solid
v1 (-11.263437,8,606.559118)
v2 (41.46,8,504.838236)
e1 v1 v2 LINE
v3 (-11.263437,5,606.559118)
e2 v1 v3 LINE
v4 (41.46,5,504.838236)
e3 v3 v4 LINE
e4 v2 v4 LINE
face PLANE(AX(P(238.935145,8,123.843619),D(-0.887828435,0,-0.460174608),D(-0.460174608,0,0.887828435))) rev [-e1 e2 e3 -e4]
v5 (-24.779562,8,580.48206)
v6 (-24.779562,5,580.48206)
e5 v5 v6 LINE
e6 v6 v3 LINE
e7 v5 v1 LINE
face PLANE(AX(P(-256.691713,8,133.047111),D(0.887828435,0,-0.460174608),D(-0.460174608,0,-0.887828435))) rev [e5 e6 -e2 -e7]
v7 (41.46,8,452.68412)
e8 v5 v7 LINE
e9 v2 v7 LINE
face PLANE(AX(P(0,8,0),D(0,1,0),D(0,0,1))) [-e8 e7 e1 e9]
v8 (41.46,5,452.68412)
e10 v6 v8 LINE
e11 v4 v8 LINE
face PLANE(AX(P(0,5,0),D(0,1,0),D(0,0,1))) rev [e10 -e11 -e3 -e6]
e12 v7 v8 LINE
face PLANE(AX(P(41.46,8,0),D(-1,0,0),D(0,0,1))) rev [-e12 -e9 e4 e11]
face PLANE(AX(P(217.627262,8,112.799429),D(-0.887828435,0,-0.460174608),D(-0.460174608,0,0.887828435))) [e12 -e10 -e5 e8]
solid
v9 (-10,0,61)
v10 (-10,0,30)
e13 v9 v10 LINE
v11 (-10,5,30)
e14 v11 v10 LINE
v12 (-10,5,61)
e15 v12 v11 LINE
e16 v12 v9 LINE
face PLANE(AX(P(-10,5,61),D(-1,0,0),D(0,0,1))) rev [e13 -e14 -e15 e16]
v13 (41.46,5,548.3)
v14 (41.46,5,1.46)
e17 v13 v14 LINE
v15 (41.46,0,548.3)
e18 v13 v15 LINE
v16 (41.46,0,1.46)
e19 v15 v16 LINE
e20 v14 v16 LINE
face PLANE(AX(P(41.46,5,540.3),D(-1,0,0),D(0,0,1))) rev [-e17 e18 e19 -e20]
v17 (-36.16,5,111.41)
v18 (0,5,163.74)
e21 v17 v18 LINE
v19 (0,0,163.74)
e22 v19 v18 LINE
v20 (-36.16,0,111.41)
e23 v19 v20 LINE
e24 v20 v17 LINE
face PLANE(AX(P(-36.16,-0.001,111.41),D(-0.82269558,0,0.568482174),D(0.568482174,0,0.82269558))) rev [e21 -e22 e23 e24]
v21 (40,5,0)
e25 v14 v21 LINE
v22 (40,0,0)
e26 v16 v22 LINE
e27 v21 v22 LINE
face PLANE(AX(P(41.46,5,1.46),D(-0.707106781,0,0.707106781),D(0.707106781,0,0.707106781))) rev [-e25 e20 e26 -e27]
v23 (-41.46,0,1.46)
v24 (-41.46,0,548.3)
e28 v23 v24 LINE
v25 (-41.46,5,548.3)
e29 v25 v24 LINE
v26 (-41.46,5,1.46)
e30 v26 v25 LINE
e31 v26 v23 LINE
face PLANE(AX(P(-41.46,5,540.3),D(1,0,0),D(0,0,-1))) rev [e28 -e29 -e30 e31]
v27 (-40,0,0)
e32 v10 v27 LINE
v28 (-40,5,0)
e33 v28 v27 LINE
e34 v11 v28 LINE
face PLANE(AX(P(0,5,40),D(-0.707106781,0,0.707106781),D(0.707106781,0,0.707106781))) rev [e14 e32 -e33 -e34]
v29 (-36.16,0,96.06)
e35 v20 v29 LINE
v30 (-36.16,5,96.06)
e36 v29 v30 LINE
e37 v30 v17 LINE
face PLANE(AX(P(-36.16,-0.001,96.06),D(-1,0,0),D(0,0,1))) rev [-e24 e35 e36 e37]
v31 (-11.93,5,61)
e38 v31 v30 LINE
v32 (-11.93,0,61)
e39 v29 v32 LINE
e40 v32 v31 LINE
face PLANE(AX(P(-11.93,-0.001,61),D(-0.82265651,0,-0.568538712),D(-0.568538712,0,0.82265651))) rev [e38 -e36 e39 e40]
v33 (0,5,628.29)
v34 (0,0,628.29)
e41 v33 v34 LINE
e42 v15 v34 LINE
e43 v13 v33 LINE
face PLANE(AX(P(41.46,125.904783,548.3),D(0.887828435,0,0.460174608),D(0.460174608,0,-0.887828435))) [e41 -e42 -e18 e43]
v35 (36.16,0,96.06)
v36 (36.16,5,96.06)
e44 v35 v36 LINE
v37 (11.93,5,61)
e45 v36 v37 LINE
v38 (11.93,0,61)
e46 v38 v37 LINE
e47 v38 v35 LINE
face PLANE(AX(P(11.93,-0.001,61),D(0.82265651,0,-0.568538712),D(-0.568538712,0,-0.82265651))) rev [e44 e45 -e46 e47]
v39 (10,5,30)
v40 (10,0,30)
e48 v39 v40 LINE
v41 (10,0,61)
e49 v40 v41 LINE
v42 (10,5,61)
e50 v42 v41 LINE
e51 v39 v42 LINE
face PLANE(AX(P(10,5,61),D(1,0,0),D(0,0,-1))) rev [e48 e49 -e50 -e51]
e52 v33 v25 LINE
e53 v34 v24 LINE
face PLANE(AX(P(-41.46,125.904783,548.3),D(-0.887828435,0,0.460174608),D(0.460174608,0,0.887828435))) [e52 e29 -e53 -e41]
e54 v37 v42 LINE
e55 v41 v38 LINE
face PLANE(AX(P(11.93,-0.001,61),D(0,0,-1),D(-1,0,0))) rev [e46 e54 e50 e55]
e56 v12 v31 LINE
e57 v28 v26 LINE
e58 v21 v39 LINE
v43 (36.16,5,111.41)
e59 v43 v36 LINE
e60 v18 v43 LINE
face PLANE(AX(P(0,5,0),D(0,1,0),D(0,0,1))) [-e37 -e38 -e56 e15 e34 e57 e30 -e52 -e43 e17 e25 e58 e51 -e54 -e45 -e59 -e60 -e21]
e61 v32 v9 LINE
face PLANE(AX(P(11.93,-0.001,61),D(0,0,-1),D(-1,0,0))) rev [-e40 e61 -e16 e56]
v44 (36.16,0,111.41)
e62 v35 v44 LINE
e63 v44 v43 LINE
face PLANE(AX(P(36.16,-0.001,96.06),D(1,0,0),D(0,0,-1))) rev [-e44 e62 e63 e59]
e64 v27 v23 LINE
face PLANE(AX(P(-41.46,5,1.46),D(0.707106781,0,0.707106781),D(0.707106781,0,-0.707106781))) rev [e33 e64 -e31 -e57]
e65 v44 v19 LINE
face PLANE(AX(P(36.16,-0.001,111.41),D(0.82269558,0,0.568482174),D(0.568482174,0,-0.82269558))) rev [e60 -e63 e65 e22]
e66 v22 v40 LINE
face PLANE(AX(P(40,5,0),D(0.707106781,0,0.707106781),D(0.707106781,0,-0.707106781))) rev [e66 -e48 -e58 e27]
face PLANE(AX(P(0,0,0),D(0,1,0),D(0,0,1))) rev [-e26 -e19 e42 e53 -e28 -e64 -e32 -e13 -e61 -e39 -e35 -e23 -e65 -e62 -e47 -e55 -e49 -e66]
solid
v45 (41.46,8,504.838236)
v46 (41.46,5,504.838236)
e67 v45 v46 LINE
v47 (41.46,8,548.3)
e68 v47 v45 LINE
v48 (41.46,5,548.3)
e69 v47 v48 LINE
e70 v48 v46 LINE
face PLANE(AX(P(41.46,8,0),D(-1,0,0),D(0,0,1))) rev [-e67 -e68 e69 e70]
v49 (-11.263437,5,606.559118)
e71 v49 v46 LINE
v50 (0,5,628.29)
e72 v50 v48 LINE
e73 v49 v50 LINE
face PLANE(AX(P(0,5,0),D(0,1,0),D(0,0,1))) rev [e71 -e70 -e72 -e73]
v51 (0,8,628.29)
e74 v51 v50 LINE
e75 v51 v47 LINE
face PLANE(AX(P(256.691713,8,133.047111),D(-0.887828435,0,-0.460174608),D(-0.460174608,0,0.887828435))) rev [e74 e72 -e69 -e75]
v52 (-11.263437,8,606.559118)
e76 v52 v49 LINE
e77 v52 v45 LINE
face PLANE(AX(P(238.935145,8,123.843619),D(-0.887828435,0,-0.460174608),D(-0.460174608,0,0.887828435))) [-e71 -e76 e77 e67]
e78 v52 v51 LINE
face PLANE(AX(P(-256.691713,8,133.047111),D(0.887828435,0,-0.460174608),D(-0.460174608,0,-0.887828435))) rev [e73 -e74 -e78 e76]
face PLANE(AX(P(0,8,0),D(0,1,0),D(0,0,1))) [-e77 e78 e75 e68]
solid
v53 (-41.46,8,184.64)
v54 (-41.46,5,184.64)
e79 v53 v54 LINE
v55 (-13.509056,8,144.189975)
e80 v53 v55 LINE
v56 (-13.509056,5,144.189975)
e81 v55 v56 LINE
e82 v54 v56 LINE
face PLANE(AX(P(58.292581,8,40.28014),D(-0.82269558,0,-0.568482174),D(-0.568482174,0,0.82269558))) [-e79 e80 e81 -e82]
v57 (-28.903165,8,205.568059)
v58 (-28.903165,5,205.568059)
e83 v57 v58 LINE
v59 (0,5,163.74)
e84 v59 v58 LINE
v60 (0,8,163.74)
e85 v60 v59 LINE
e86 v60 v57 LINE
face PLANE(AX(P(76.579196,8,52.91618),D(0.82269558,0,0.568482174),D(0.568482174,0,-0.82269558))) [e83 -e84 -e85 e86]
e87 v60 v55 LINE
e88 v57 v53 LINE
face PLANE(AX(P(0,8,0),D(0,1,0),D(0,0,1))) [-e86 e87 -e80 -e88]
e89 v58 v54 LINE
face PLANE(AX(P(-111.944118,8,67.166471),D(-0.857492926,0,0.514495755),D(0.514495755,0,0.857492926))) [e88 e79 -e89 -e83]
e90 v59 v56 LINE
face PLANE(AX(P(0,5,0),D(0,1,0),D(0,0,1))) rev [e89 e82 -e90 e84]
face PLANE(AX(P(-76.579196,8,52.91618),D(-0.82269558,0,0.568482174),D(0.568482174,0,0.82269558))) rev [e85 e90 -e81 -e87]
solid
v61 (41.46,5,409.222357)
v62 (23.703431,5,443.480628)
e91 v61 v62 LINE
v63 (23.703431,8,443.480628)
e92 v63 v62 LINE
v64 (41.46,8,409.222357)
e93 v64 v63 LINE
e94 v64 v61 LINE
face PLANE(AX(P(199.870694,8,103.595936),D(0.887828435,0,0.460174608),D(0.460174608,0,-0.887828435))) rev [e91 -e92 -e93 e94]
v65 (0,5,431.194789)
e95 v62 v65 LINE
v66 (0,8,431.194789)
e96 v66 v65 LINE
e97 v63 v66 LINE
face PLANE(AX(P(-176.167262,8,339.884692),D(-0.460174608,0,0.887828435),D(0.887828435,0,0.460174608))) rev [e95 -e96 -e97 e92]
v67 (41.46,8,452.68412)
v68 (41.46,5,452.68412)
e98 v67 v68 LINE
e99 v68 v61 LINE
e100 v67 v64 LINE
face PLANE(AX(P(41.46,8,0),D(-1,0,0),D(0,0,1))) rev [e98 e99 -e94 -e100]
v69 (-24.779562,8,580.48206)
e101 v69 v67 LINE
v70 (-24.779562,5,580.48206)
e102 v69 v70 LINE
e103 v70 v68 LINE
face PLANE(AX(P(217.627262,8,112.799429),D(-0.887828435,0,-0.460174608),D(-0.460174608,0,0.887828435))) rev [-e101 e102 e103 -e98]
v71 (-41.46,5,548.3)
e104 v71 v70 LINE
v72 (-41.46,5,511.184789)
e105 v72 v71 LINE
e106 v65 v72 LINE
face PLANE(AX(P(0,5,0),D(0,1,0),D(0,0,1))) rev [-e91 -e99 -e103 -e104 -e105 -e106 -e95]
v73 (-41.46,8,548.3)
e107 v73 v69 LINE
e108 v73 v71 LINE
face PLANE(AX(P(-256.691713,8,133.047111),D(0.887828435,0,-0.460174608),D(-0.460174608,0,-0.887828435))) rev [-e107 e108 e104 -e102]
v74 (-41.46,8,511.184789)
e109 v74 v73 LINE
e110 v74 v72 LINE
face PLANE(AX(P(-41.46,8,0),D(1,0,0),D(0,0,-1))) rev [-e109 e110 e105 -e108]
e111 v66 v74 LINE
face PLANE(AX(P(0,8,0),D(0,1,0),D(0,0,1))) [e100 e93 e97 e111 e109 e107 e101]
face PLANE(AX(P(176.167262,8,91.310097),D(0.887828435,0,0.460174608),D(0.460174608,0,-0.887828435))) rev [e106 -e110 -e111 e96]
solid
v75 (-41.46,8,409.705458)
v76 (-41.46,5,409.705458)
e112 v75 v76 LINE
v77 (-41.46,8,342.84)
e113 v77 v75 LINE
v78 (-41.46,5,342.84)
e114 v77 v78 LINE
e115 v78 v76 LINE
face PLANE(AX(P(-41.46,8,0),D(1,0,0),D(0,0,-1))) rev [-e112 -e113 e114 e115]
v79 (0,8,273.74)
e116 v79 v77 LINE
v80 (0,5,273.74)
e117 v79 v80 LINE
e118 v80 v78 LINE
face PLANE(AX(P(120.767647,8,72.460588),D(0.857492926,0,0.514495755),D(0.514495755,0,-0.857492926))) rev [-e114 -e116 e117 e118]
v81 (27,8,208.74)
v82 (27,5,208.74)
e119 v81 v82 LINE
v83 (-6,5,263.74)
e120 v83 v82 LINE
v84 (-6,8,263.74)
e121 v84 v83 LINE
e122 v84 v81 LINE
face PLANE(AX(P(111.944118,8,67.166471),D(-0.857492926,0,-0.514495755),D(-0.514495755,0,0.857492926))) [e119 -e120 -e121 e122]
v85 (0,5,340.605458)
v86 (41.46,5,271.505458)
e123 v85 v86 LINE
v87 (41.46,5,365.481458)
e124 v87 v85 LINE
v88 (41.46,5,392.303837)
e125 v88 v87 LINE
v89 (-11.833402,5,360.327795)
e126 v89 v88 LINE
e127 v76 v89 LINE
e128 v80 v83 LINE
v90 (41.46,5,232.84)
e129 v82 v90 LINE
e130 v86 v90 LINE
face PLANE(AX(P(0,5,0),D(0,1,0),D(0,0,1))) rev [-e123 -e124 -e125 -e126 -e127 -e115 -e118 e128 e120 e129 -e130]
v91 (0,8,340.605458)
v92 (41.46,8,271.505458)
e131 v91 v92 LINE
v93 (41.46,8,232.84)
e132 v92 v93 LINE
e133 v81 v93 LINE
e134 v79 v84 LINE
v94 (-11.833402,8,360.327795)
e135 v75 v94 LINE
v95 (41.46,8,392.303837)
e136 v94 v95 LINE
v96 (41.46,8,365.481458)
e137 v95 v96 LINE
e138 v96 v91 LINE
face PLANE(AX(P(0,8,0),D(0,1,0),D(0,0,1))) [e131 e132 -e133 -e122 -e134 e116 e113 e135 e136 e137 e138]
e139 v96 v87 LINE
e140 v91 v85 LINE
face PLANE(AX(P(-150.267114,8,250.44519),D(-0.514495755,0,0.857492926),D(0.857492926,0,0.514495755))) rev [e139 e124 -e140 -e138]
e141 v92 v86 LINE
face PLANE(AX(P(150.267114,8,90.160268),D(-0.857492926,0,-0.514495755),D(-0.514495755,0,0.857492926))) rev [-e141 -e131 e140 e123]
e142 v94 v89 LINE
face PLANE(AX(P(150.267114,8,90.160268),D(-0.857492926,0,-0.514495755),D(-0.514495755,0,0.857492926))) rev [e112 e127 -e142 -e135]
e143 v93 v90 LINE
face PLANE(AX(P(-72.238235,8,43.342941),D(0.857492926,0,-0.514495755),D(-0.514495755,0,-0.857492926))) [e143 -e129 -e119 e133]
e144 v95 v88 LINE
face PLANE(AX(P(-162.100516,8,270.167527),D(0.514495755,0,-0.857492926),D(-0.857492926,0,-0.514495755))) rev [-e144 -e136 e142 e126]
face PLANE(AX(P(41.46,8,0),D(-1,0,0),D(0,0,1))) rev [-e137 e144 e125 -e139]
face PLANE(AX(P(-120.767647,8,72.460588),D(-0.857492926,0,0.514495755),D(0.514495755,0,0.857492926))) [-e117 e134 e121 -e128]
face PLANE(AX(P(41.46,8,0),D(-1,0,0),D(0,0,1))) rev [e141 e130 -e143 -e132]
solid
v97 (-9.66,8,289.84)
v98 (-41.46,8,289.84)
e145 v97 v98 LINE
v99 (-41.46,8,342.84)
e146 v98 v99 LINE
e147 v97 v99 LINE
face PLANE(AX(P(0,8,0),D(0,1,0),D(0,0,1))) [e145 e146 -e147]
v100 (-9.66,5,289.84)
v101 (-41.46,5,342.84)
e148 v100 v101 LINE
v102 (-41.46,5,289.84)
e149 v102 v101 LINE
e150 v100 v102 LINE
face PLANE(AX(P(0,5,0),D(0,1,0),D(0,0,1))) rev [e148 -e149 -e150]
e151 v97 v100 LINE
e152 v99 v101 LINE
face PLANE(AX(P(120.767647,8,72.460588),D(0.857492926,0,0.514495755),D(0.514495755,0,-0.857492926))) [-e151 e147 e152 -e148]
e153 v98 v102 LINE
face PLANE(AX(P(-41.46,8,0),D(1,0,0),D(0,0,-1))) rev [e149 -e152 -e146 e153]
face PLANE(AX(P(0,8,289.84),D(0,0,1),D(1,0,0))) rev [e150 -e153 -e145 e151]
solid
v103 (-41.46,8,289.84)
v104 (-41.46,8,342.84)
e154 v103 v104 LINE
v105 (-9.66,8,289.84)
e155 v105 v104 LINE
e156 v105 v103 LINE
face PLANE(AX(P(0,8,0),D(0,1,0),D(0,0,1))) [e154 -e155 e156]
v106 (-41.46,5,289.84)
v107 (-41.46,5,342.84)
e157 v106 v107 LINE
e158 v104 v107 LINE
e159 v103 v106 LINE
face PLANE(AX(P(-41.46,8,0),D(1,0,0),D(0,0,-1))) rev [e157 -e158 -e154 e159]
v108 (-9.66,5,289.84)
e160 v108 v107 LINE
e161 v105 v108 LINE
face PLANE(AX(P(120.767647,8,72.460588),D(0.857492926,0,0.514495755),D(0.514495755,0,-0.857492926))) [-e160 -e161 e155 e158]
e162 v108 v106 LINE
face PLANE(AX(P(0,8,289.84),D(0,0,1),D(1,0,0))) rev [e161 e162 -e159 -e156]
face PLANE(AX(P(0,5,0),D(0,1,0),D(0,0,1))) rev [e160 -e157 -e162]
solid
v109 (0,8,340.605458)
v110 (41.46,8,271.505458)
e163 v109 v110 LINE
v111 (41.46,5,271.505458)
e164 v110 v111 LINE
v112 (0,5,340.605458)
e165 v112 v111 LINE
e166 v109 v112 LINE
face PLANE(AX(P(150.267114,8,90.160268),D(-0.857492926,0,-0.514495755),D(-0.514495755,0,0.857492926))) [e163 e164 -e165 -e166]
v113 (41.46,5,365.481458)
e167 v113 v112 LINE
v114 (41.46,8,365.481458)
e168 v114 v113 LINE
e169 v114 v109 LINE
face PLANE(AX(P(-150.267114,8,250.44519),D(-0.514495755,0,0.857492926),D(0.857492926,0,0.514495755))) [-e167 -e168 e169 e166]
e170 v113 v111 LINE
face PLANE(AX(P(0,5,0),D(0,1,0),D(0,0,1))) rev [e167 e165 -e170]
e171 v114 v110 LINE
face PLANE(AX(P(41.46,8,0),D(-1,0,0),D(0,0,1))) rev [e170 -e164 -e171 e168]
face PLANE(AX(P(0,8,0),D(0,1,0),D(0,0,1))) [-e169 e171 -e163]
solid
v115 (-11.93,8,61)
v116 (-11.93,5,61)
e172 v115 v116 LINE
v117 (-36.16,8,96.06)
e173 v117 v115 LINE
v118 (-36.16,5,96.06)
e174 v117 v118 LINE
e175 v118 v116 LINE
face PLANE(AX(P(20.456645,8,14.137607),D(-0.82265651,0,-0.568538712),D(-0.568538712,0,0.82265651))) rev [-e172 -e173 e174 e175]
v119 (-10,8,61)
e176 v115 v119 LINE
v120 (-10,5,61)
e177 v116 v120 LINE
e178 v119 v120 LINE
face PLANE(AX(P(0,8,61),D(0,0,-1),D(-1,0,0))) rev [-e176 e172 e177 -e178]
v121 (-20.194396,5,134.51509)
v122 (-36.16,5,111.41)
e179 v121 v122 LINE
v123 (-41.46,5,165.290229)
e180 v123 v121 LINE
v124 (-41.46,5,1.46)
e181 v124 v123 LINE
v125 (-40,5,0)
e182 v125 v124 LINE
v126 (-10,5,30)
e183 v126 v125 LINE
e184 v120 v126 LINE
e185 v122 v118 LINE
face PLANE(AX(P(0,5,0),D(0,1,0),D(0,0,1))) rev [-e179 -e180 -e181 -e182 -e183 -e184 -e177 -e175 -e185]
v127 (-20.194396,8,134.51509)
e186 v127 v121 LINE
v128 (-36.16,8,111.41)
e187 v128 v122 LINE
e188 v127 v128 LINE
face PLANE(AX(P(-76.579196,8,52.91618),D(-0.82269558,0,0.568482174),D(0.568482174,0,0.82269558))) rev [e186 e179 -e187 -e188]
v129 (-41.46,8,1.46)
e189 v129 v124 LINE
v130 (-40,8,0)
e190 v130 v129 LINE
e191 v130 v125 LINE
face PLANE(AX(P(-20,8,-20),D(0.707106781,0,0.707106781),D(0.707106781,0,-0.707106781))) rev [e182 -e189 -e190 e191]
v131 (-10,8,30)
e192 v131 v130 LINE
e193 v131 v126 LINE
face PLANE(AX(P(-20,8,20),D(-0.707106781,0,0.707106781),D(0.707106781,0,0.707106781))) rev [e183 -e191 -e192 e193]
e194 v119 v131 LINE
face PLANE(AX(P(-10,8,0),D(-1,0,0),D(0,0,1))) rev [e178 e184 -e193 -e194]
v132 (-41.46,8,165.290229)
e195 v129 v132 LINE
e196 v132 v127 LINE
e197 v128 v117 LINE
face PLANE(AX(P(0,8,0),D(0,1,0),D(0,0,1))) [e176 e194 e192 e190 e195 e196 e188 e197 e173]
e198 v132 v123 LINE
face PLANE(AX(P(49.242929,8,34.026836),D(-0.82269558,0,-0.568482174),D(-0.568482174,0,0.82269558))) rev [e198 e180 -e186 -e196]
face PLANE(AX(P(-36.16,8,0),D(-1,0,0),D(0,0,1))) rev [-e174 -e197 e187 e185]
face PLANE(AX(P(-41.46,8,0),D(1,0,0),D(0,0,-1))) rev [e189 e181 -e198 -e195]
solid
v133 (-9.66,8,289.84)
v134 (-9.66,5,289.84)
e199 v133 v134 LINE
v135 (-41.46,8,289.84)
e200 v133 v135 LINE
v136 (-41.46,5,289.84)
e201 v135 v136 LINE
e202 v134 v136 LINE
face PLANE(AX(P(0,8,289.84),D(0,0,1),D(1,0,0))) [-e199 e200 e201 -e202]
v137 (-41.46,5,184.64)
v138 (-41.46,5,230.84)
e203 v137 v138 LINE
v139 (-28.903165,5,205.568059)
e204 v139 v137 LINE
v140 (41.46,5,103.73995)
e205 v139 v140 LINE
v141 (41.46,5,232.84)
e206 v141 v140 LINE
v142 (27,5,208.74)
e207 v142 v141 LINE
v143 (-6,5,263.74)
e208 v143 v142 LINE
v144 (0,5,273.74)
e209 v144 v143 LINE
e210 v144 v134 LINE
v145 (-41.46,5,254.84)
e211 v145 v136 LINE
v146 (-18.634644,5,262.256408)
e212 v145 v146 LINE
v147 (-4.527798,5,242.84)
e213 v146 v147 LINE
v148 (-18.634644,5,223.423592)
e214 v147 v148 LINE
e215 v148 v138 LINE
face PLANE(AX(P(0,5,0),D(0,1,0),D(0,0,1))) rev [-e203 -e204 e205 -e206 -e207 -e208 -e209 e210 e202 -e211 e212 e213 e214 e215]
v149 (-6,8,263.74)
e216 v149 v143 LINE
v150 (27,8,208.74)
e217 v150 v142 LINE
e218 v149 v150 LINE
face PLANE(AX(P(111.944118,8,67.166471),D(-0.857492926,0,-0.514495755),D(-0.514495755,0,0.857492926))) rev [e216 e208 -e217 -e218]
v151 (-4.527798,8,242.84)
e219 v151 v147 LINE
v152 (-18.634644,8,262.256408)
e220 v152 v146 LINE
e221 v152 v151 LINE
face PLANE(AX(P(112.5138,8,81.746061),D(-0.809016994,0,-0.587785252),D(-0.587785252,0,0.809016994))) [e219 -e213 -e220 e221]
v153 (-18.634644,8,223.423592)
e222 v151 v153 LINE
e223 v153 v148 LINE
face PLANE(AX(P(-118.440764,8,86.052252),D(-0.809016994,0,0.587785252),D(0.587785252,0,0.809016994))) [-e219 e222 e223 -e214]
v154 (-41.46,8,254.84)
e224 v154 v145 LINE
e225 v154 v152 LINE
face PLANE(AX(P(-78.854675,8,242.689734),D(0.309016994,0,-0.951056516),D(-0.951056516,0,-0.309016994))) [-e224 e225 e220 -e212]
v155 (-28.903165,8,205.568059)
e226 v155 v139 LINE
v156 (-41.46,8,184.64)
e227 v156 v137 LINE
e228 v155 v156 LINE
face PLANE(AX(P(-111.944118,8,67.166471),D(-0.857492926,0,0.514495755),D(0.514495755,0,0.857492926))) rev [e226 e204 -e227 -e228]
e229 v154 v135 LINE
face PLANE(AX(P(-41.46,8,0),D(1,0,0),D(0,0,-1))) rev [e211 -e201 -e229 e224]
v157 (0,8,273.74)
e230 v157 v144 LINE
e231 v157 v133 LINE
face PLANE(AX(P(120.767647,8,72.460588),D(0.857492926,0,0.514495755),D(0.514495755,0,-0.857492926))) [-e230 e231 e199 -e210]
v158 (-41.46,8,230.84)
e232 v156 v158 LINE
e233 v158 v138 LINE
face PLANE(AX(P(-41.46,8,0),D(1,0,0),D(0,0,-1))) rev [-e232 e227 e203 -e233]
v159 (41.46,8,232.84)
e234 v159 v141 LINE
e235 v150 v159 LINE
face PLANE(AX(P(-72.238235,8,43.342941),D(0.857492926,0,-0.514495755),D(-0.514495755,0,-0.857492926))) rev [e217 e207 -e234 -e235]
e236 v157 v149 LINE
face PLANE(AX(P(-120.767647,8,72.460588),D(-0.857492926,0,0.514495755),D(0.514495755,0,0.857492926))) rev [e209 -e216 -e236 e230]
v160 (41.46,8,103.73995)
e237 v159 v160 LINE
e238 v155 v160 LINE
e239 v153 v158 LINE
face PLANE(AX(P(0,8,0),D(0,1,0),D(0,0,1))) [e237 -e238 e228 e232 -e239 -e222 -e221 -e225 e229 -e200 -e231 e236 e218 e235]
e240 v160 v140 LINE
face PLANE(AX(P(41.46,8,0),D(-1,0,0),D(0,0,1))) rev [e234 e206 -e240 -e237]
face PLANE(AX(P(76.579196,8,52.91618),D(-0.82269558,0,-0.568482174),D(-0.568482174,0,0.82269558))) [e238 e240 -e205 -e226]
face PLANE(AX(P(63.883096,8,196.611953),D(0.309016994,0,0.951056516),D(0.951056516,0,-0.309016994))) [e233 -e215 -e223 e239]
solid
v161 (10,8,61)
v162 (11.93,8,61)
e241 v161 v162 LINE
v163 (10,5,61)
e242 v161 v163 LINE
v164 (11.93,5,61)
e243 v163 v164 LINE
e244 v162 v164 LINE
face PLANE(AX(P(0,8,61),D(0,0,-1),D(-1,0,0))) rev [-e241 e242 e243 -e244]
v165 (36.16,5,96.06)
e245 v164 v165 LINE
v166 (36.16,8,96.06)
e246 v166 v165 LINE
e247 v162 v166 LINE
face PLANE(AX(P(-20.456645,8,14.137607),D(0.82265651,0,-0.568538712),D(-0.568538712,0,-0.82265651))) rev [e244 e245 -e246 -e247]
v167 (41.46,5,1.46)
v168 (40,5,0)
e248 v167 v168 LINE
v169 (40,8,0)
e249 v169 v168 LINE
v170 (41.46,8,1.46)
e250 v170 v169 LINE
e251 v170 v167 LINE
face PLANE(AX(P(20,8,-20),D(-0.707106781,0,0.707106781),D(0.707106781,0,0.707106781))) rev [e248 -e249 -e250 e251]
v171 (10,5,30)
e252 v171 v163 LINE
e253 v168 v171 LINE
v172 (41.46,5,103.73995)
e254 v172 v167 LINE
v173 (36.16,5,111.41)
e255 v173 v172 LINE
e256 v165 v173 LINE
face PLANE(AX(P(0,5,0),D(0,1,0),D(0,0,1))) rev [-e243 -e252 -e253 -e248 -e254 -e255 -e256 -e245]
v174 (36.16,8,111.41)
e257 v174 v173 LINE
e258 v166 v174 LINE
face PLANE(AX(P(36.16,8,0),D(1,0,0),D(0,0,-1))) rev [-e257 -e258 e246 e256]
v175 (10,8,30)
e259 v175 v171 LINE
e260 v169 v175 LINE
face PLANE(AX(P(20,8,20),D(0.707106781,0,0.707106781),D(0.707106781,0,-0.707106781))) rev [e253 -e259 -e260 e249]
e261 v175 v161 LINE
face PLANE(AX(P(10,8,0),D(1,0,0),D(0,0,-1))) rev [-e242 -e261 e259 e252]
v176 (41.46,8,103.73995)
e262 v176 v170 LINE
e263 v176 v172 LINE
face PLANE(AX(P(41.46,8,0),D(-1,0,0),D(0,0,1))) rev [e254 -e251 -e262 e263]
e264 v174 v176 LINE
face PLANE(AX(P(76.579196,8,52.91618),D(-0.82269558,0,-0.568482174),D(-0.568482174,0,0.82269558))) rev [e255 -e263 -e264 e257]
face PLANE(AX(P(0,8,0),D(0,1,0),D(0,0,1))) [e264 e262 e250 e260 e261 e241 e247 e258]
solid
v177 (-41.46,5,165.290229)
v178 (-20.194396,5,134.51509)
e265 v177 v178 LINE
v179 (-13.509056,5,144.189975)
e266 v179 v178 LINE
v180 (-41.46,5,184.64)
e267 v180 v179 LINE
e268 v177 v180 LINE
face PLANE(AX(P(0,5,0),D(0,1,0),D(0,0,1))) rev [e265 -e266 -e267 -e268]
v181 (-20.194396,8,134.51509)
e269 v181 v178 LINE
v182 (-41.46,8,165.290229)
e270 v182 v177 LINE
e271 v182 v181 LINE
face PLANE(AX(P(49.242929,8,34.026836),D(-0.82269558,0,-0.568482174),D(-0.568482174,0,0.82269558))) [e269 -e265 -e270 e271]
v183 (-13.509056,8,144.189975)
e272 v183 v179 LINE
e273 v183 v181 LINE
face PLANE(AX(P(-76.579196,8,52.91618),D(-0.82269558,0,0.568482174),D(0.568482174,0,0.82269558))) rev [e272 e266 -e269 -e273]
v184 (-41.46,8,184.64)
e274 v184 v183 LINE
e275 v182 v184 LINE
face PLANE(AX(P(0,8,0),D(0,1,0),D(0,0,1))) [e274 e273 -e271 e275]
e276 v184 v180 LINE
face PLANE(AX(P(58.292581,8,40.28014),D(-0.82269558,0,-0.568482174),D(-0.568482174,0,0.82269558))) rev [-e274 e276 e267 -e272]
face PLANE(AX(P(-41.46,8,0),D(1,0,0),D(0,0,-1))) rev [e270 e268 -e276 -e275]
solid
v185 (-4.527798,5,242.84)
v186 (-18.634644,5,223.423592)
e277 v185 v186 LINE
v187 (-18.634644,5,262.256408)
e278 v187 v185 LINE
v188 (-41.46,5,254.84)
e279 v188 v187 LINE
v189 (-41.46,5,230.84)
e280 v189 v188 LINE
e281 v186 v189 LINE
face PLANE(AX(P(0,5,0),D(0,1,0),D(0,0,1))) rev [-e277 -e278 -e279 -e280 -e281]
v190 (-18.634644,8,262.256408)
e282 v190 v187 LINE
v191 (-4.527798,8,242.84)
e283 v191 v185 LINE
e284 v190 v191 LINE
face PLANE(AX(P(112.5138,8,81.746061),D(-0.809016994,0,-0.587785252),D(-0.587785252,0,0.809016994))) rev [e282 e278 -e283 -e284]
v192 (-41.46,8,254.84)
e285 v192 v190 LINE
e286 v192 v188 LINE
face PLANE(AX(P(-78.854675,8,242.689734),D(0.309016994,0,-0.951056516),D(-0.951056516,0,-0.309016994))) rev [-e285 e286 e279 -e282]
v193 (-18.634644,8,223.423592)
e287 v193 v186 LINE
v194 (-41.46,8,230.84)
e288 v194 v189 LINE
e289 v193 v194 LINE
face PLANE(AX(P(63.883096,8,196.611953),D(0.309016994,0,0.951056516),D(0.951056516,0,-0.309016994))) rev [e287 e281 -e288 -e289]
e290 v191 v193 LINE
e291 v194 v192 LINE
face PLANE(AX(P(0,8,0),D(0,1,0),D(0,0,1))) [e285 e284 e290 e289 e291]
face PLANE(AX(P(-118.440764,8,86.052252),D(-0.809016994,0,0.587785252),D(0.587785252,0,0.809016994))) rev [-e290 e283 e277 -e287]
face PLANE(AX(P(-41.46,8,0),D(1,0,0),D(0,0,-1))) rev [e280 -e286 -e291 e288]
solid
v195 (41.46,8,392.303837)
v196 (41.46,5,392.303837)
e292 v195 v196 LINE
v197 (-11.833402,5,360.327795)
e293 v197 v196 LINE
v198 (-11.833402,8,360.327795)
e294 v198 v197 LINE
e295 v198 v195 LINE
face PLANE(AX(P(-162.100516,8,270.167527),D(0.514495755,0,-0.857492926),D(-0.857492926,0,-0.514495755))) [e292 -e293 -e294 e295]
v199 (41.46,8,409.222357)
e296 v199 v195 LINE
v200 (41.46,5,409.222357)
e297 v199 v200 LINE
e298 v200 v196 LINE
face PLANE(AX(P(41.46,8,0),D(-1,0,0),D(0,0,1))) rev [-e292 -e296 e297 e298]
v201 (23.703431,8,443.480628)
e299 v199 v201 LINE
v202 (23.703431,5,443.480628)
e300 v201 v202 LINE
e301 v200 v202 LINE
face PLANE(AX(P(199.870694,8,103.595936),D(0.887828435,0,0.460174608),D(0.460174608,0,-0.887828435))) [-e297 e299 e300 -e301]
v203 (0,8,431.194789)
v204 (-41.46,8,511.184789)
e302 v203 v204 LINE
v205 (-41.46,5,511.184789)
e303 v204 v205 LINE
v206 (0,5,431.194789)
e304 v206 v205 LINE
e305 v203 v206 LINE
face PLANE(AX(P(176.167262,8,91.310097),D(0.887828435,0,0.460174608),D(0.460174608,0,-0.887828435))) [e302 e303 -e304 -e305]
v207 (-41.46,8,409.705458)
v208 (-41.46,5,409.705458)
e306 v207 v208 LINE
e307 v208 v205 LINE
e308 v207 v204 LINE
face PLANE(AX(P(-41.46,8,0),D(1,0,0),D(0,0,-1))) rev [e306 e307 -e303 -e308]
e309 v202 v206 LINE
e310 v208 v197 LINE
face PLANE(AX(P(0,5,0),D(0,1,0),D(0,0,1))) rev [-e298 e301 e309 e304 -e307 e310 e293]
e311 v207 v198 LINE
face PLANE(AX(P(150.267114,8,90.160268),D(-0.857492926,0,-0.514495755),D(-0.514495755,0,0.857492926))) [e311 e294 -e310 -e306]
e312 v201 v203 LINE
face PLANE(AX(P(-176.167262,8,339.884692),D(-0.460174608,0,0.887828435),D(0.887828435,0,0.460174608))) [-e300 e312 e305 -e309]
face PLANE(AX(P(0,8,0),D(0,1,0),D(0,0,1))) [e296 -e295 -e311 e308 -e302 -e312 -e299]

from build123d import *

# Parameters (mm, degrees)
EXTRUDE_1_DEPTH          = 5
CUT_EXTRUDE_1_REACH      = 623.694
CUT_EXTRUDE_8_DEPTH      = 622.694149643
CUT_EXTRUDE_8_DEPTH_BACK = 622.694149643
SKETCH_4_W               = 20
SKETCH_4_H               = 31
EXTRUDE_2_DEPTH          = 5
EXTRUDE_8_DEPTH          = 3
EXTRUDE_8_2_DEPTH        = 3
EXTRUDE_8_3_DEPTH        = 3
EXTRUDE_8_4_DEPTH        = 3
EXTRUDE_8_5_DEPTH        = 3
EXTRUDE_9_DEPTH          = 3
EXTRUDE_9_2_DEPTH        = 3
EXTRUDE_12_DEPTH         = 3
EXTRUDE_12_2_DEPTH       = 3
EXTRUDE_12_3_DEPTH       = 3
EXTRUDE_12_4_DEPTH       = 3
EXTRUDE_12_5_DEPTH       = 3
EXTRUDE_14_DEPTH         = 3
EXTRUDE_14_2_DEPTH       = 3


# Read off the part's stored shape, not the designer's step: 凸台-拉伸9
with BuildPart() as part:
    # 草图1 → 凸台-拉伸1 (new body)
    with BuildSketch(Plane(origin=(0, 0, 0), x_dir=(1, 0, 0), z_dir=(0, 1, 0))):
        Polygon((40, 0), (0, -40), (-40, 0), (-41.46, -1.46), (-41.46, -540.3), (0, -620.29), (41.46, -540.3), (41.46, -1.46), align=None)
    extrude(amount=EXTRUDE_1_DEPTH)

    # 草图2 → 切除-拉伸1 (cut, up to next)
    with BuildSketch(Plane(origin=(0, 5, 0), x_dir=(1, 0, 0), z_dir=(0, 1, 0)), mode=Mode.PRIVATE) as cut_extrude_1_sk1:
        Polygon((11.93, -61), (-11.93, -61), (-36.16, -96.06), (-36.16, -111.41), (0, -163.74), (36.16, -111.41), (36.16, -96.06), align=None)
    cut_extrude_1_tool1 = extrude(cut_extrude_1_sk1.sketch, amount=-CUT_EXTRUDE_1_REACH, mode=Mode.PRIVATE) & part.part
    add(cut_extrude_1_tool1.solids().sort_by_distance((0, 5, 105.867422))[0], mode=Mode.SUBTRACT)

    # 草图4 → 切除-拉伸8 (cut, two sides: drawn at the far end of the back side and taken through both)
    with BuildSketch(Plane.XZ.offset(-CUT_EXTRUDE_8_DEPTH_BACK)):
        with Locations((0, 45.5)):
            Rectangle(SKETCH_4_W, SKETCH_4_H)
    extrude(amount=CUT_EXTRUDE_8_DEPTH + CUT_EXTRUDE_8_DEPTH_BACK, mode=Mode.SUBTRACT)

    # 草图5 → 凸台-拉伸2 (add)
    with BuildSketch(Plane.XZ):
        Polygon((-41.46, 540.3), (-41.46, 548.3), (0, 628.29), (41.46, 548.3), (41.46, 540.3), (0, 620.29), align=None)
    extrude(amount=-EXTRUDE_2_DEPTH)


with BuildPart() as body_2:
    # 草图9 → 凸台-拉伸8 (new body)
    with BuildSketch(Plane(origin=(0, 5, 0), x_dir=(1, 0, 0), z_dir=(0, 1, 0))):
        Polygon((-41.46, -342.84), (-9.66, -289.84), (-41.46, -289.84), align=None)
    extrude(amount=EXTRUDE_8_DEPTH)


with BuildPart() as body_3:
    # 草图9 → Extrude 8 2 (new body)
    with BuildSketch(Plane(origin=(0, 5, 0), x_dir=(1, 0, 0), z_dir=(0, 1, 0))):
        Polygon((-28.903164688, -205.568058853), (0, -163.74), (-13.509055991, -144.189975111), (-41.46, -184.64), align=None)
    extrude(amount=EXTRUDE_8_2_DEPTH)


with BuildPart() as body_4:
    # 草图9 → Extrude 8 3 (new body)
    with BuildSketch(Plane(origin=(0, 5, 0), x_dir=(1, 0, 0), z_dir=(0, 1, 0))):
        Polygon((-41.46, -230.84), (-41.46, -254.84), (-18.634643609, -262.256407865), (-4.527797554, -242.84), (-18.634643609, -223.423592135), align=None)
    extrude(amount=EXTRUDE_8_3_DEPTH)


with BuildPart() as body_5:
    # 草图9 → Extrude 8 4 (new body)
    with BuildSketch(Plane(origin=(0, 5, 0), x_dir=(1, 0, 0), z_dir=(0, 1, 0))):
        Polygon((36.16, -111.41), (41.46, -103.739950221), (41.46, -1.46), (40, 0), (10, -30), (10, -61), (11.93, -61), (36.16, -96.06), align=None)
    extrude(amount=EXTRUDE_8_4_DEPTH)


with BuildPart() as body_6:
    # 草图9 → Extrude 8 5 (new body)
    with BuildSketch(Plane(origin=(0, 5, 0), x_dir=(1, 0, 0), z_dir=(0, 1, 0))):
        Polygon((-41.46, -165.290228805), (-20.194396392, -134.515089513), (-36.16, -111.41), (-36.16, -96.06), (-11.93, -61), (-10, -61), (-10, -30), (-40, 0), (-41.46, -1.46), align=None)
    extrude(amount=EXTRUDE_8_5_DEPTH)


with BuildPart() as body_7:
    # 凸台-拉伸9 outline → 凸台-拉伸9 (new body)
    with BuildSketch(Plane(origin=(0, 5, 0), x_dir=(1, 0, 0), z_dir=(0, 1, 0))):
        Polygon((41.46, -548.3), (41.46, -504.838236483), (-11.263437401, -606.559118242), (0, -628.29), align=None)
    extrude(amount=EXTRUDE_9_DEPTH)


with BuildPart() as body_8:
    # Extrude 9 2 outline → Extrude 9 2 (new body)
    with BuildSketch(Plane(origin=(0, 5, 0), x_dir=(1, 0, 0), z_dir=(0, 1, 0))):
        Polygon((-41.46, -289.84), (-41.46, -342.84), (-9.66, -289.84), align=None)
    extrude(amount=EXTRUDE_9_2_DEPTH)


with BuildPart() as body_9:
    # 草图9<12> → 凸台-拉伸12 (new body)
    with BuildSketch(Plane(origin=(0, 5, 0), x_dir=(1, 0, 0), z_dir=(0, 1, 0))):
        Polygon((-9.66, -289.84), (0, -273.74), (-6, -263.74), (27, -208.74), (41.46, -232.84), (41.46, -103.739950221), (-28.903164688, -205.568058853), (-41.46, -184.64), (-41.46, -230.84), (-18.634643609, -223.423592135), (-4.527797554, -242.84), (-18.634643609, -262.256407865), (-41.46, -254.84), (-41.46, -289.84), align=None)
    extrude(amount=EXTRUDE_12_DEPTH)


with BuildPart() as body_10:
    # 草图9<12> → Extrude 12 2 (new body)
    with BuildSketch(Plane(origin=(0, 5, 0), x_dir=(1, 0, 0), z_dir=(0, 1, 0))):
        Polygon((-11.833402375, -360.327795222), (-41.46, -409.70545793), (-41.46, -511.184789097), (0, -431.194789097), (23.703431301, -443.480628098), (41.46, -409.222356746), (41.46, -392.303836646), align=None)
    extrude(amount=EXTRUDE_12_2_DEPTH)


with BuildPart() as body_11:
    # 草图9<12> → Extrude 12 3 (new body)
    with BuildSketch(Plane(origin=(0, 5, 0), x_dir=(1, 0, 0), z_dir=(0, 1, 0))):
        Polygon((41.46, -365.48145793), (41.46, -271.50545793), (0, -340.60545793), align=None)
    extrude(amount=EXTRUDE_12_3_DEPTH)


with BuildPart() as body_12:
    # 草图9<12> → Extrude 12 4 (new body)
    with BuildSketch(Plane(origin=(0, 5, 0), x_dir=(1, 0, 0), z_dir=(0, 1, 0))):
        Polygon((-41.46, -184.64), (-13.509055991, -144.189975111), (-20.194396392, -134.515089513), (-41.46, -165.290228805), align=None)
    extrude(amount=EXTRUDE_12_4_DEPTH)


with BuildPart() as body_13:
    # 草图9<12> → Extrude 12 5 (new body)
    with BuildSketch(Plane(origin=(0, 5, 0), x_dir=(1, 0, 0), z_dir=(0, 1, 0))):
        Polygon((41.46, -504.838236483), (41.46, -452.684120263), (-24.779562282, -580.482060131), (-11.263437401, -606.559118242), align=None)
    extrude(amount=EXTRUDE_12_5_DEPTH)


with BuildPart() as body_14:
    # 草图9<17> → 凸台-拉伸14 (new body)
    with BuildSketch(Plane(origin=(0, 5, 0), x_dir=(1, 0, 0), z_dir=(0, 1, 0))):
        Polygon((27, -208.74), (-6, -263.74), (0, -273.74), (-41.46, -342.84), (-41.46, -409.70545793), (-11.833402375, -360.327795222), (41.46, -392.303836646), (41.46, -365.48145793), (0, -340.60545793), (41.46, -271.50545793), (41.46, -232.84), align=None)
    extrude(amount=EXTRUDE_14_DEPTH)


with BuildPart() as body_15:
    # 草图9<17> → Extrude 14 2 (new body)
    with BuildSketch(Plane(origin=(0, 5, 0), x_dir=(1, 0, 0), z_dir=(0, 1, 0))):
        Polygon((23.703431301, -443.480628098), (0, -431.194789097), (-41.46, -511.184789097), (-41.46, -548.3), (-24.779562282, -580.482060131), (41.46, -452.684120263), (41.46, -409.222356746), align=None)
    extrude(amount=EXTRUDE_14_2_DEPTH)


solid = Compound([part.part, body_2.part, body_3.part, body_4.part, body_5.part, body_6.part, body_7.part, body_8.part, body_9.part, body_10.part, body_11.part, body_12.part, body_13.part, body_14.part, body_15.part])
